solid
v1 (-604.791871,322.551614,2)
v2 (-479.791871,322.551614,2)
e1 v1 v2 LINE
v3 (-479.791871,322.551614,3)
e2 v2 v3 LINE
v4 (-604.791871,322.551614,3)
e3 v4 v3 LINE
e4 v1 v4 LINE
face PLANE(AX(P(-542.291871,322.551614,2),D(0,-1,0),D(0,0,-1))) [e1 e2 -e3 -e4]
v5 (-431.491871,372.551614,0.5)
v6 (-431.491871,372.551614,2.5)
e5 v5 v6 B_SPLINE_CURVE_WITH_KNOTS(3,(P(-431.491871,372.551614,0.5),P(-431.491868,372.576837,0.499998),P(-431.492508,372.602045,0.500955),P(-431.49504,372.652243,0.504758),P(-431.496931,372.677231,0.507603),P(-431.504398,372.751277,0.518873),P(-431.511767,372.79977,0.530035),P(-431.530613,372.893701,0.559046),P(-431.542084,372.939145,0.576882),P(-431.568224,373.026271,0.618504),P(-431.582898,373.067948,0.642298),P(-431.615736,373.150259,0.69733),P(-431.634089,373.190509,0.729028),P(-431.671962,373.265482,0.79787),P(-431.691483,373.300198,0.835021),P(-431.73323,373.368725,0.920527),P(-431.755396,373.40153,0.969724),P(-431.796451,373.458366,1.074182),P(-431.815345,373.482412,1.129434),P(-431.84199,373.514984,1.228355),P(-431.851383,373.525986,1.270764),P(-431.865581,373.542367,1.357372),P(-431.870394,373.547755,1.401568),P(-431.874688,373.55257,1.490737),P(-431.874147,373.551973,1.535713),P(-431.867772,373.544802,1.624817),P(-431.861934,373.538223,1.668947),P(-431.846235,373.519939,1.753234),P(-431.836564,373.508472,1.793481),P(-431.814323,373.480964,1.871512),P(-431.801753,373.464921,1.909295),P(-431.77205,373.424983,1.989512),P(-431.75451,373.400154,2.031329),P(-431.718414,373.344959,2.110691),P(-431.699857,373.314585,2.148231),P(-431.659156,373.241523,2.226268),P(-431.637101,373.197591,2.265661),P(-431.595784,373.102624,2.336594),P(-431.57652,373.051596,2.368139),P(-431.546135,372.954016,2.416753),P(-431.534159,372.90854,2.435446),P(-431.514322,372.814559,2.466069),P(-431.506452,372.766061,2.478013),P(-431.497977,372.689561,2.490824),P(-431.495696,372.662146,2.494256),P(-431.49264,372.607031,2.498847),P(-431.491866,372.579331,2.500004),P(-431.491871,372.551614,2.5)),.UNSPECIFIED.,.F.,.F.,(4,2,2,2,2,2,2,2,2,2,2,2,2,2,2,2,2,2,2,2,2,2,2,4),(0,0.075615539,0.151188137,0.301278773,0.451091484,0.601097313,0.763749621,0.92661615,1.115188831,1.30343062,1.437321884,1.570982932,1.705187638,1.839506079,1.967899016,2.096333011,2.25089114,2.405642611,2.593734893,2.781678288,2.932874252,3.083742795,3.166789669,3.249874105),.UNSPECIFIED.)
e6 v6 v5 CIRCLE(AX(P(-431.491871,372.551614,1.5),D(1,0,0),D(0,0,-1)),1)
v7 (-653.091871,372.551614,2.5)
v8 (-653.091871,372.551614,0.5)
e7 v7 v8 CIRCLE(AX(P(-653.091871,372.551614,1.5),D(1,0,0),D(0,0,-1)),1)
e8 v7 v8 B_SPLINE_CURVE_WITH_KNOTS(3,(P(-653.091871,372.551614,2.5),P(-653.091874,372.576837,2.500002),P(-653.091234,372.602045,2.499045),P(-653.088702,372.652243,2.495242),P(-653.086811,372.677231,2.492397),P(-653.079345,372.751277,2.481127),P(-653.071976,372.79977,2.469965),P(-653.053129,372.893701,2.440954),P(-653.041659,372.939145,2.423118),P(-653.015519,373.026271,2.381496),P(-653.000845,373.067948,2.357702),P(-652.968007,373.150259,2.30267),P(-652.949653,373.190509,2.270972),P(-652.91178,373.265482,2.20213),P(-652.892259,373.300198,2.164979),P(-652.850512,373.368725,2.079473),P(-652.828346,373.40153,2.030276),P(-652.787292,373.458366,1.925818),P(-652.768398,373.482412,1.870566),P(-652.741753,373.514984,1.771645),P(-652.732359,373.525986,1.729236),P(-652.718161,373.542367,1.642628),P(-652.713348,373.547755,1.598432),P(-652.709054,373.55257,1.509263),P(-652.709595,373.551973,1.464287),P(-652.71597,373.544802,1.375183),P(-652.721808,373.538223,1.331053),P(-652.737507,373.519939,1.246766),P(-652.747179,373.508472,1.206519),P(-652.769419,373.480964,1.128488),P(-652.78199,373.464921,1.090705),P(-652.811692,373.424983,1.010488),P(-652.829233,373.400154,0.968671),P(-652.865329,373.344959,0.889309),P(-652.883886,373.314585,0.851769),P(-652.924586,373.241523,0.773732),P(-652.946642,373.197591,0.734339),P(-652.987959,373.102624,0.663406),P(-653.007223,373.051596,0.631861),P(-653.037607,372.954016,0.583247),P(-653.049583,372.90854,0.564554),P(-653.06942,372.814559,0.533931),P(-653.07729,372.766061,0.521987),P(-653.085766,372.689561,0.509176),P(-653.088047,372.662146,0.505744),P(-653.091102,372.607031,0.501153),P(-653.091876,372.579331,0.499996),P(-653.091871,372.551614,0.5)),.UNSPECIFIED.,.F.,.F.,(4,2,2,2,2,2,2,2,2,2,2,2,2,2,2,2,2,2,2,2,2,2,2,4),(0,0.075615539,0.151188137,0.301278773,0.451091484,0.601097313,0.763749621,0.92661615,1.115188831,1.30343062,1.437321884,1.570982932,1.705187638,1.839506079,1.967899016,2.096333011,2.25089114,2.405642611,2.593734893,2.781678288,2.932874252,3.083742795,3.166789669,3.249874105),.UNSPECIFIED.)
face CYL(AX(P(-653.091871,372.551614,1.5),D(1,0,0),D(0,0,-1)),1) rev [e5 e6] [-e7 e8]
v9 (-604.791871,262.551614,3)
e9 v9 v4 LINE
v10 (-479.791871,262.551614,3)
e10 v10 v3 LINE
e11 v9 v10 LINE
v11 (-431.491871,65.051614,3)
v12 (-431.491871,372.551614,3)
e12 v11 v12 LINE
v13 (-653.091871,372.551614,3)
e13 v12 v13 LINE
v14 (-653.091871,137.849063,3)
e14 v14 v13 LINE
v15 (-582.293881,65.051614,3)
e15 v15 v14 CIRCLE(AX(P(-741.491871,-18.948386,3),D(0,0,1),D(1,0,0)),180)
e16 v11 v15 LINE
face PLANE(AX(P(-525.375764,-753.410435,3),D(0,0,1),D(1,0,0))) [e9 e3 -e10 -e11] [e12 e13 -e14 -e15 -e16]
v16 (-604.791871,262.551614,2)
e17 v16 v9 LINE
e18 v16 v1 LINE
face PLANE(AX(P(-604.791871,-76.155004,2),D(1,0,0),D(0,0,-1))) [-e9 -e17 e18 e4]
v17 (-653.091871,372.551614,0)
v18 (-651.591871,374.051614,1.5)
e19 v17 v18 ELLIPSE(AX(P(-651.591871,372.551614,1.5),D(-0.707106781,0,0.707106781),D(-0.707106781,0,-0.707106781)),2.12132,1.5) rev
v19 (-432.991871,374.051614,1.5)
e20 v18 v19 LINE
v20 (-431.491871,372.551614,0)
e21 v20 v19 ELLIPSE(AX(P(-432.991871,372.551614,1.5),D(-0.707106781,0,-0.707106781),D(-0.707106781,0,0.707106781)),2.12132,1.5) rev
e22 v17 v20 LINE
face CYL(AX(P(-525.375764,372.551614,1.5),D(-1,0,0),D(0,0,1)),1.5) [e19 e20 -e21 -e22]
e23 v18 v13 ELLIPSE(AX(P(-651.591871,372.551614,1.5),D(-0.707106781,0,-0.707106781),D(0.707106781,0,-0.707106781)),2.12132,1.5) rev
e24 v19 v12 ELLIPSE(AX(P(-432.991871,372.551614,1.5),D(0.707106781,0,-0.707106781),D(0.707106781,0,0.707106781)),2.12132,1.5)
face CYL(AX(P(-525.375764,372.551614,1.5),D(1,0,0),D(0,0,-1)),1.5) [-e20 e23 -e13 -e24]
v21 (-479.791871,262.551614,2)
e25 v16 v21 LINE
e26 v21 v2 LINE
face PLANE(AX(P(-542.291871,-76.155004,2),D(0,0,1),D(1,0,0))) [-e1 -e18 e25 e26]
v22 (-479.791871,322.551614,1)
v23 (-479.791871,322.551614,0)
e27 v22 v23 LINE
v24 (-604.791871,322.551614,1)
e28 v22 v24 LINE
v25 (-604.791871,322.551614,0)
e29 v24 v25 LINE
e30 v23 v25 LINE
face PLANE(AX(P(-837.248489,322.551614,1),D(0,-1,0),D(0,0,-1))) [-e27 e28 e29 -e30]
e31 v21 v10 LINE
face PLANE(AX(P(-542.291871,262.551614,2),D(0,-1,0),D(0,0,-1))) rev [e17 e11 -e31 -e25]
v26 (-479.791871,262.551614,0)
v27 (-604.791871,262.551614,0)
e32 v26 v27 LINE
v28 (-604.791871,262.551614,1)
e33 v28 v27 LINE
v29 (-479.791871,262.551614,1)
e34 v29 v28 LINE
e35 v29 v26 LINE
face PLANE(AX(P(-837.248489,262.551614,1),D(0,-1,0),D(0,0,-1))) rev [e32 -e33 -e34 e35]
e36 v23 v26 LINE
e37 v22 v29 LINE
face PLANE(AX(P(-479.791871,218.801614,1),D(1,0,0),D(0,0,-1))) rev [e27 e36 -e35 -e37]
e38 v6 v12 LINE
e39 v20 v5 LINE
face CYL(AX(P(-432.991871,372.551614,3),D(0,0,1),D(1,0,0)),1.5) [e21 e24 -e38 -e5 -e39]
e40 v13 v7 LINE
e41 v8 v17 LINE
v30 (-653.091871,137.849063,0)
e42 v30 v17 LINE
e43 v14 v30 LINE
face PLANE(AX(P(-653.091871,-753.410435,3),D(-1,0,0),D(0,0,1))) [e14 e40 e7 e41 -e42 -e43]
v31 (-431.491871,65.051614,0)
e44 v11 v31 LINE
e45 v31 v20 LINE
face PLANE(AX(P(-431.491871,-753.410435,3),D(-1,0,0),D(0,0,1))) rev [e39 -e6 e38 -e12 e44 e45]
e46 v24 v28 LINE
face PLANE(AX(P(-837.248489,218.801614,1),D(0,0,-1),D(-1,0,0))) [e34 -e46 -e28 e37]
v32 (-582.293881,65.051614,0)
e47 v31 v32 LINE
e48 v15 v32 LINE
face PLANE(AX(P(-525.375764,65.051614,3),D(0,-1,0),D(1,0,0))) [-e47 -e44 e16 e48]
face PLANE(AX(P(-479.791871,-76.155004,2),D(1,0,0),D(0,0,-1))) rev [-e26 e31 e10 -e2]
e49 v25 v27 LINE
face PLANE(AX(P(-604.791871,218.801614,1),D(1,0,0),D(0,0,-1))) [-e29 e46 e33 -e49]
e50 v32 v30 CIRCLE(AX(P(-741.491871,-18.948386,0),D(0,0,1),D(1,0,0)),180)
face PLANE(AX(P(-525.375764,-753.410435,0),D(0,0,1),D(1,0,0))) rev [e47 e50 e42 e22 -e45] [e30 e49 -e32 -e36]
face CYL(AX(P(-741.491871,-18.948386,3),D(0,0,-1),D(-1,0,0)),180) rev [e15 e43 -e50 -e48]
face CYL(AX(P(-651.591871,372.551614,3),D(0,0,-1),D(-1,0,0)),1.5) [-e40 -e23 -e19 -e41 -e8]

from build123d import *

# Parameters (mm, degrees)
EXTRUDE_1_DEPTH     = 3
SKETCH_3_R          = 1
CUT_EXTRUDE_1_DEPTH = 435.775999416
FILLET_1_R          = 1.5
SKETCH_4_W          = 125
SKETCH_4_H          = 60
CUT_EXTRUDE_2_DEPTH = 1
CUT_EXTRUDE_3_DEPTH = 1


with BuildPart() as part:
    # 草图1 → 凸台-拉伸1 (new body)
    with BuildSketch(Plane.XY):
        with BuildLine():
            Line((-582.293881309, 65.051613642), (-431.491871246, 65.051613642))
            Line((-431.491871246, 65.051613642), (-431.491871246, 374.051613642))
            Line((-431.491871246, 374.051613642), (-653.091871246, 374.051613642))
            Line((-653.091871246, 374.051613642), (-653.091871246, 137.849062601))
            ThreePointArc((-653.091871246, 137.849062601), (-612.452891481, 106.546401187), (-582.293881309, 65.051613642))
        make_face()
    extrude(amount=EXTRUDE_1_DEPTH)

    # 草图3 → 切除-拉伸1 (cut, through all)
    with BuildSketch(Plane(origin=(-431.491871246, 0, 0), x_dir=(0, 0, -1), z_dir=(1, 0, 0))):
        with Locations((-1.5, 372.551613642)):
            Circle(SKETCH_3_R)
    extrude(amount=-CUT_EXTRUDE_1_DEPTH, mode=Mode.SUBTRACT)

    # 圆角1
    # the kernel refuses this fillet: 1.5 mm, written as the material it takes off along each edge
    with BuildSketch(Plane(origin=(-653.091871246, 374.051613642, -3.75), x_dir=(0, -1, 0), z_dir=(0, 0, 1)), Plane(origin=(-431.491871246, 374.051613642, -3.75), x_dir=(-1, 0, 0), z_dir=(0, 0, 1))) as fillet_1_piece_1:
        with BuildLine():
            CenterArc((FILLET_1_R, FILLET_1_R), FILLET_1_R, 180, 90)
            Line((0, FILLET_1_R), (0, 0))
            Line((0, 0), (FILLET_1_R, 0))
        make_face()
    extrude(amount=10.5, mode=Mode.SUBTRACT)
    with BuildSketch(Plane(origin=(-427.741871246, 374.051613642, 3), x_dir=(0, -1, 0), z_dir=(-1, 0, 0))) as fillet_1_piece_2:
        with BuildLine():
            CenterArc((FILLET_1_R, -FILLET_1_R), FILLET_1_R, 90, 90)
            Line((0, -FILLET_1_R), (0, 0))
            Line((0, 0), (FILLET_1_R, 0))
        make_face()
    extrude(amount=229.1, mode=Mode.SUBTRACT)
    with BuildSketch(Plane(origin=(-427.741871246, 374.051613642, 0), x_dir=(0, -1, 0), z_dir=(-1, 0, 0))) as fillet_1_piece_3:
        with BuildLine():
            CenterArc((FILLET_1_R, FILLET_1_R), FILLET_1_R, 180, 90)
            Line((0, FILLET_1_R), (0, 0))
            Line((0, 0), (FILLET_1_R, 0))
        make_face()
    extrude(amount=229.1, mode=Mode.SUBTRACT)

    # 草图4 → 切除-拉伸2 (cut)
    with BuildSketch(Plane(origin=(0, 0, 0), x_dir=(-1, 0, 0), z_dir=(0, 0, -1))):
        with Locations((542.291871246, 292.551613642)):
            Rectangle(SKETCH_4_W, SKETCH_4_H)
    extrude(amount=-CUT_EXTRUDE_2_DEPTH, mode=Mode.SUBTRACT)

    # 草图5 → 切除-拉伸3 (cut)
    with BuildSketch(Plane.XY.offset(3)):
        Polygon((-479.791871246, 322.551613642), (-500.741871246, 322.551613642), (-542.291871246, 292.551613642), (-500.741871246, 262.551613642), (-479.791871246, 262.551613642), align=None)
        Polygon((-500.741871246, 322.551613642), (-583.841871246, 322.551613642), (-542.291871246, 292.551613642), align=None)
        Polygon((-542.291871246, 292.551613642), (-583.841871246, 322.551613642), (-604.791871246, 322.551613642), (-604.791871246, 262.551613642), (-583.841871246, 262.551613642), align=None)
        Polygon((-542.291871246, 292.551613642), (-583.841871246, 262.551613642), (-500.741871246, 262.551613642), align=None)
    extrude(amount=-CUT_EXTRUDE_3_DEPTH, mode=Mode.SUBTRACT)


solid = part.part
